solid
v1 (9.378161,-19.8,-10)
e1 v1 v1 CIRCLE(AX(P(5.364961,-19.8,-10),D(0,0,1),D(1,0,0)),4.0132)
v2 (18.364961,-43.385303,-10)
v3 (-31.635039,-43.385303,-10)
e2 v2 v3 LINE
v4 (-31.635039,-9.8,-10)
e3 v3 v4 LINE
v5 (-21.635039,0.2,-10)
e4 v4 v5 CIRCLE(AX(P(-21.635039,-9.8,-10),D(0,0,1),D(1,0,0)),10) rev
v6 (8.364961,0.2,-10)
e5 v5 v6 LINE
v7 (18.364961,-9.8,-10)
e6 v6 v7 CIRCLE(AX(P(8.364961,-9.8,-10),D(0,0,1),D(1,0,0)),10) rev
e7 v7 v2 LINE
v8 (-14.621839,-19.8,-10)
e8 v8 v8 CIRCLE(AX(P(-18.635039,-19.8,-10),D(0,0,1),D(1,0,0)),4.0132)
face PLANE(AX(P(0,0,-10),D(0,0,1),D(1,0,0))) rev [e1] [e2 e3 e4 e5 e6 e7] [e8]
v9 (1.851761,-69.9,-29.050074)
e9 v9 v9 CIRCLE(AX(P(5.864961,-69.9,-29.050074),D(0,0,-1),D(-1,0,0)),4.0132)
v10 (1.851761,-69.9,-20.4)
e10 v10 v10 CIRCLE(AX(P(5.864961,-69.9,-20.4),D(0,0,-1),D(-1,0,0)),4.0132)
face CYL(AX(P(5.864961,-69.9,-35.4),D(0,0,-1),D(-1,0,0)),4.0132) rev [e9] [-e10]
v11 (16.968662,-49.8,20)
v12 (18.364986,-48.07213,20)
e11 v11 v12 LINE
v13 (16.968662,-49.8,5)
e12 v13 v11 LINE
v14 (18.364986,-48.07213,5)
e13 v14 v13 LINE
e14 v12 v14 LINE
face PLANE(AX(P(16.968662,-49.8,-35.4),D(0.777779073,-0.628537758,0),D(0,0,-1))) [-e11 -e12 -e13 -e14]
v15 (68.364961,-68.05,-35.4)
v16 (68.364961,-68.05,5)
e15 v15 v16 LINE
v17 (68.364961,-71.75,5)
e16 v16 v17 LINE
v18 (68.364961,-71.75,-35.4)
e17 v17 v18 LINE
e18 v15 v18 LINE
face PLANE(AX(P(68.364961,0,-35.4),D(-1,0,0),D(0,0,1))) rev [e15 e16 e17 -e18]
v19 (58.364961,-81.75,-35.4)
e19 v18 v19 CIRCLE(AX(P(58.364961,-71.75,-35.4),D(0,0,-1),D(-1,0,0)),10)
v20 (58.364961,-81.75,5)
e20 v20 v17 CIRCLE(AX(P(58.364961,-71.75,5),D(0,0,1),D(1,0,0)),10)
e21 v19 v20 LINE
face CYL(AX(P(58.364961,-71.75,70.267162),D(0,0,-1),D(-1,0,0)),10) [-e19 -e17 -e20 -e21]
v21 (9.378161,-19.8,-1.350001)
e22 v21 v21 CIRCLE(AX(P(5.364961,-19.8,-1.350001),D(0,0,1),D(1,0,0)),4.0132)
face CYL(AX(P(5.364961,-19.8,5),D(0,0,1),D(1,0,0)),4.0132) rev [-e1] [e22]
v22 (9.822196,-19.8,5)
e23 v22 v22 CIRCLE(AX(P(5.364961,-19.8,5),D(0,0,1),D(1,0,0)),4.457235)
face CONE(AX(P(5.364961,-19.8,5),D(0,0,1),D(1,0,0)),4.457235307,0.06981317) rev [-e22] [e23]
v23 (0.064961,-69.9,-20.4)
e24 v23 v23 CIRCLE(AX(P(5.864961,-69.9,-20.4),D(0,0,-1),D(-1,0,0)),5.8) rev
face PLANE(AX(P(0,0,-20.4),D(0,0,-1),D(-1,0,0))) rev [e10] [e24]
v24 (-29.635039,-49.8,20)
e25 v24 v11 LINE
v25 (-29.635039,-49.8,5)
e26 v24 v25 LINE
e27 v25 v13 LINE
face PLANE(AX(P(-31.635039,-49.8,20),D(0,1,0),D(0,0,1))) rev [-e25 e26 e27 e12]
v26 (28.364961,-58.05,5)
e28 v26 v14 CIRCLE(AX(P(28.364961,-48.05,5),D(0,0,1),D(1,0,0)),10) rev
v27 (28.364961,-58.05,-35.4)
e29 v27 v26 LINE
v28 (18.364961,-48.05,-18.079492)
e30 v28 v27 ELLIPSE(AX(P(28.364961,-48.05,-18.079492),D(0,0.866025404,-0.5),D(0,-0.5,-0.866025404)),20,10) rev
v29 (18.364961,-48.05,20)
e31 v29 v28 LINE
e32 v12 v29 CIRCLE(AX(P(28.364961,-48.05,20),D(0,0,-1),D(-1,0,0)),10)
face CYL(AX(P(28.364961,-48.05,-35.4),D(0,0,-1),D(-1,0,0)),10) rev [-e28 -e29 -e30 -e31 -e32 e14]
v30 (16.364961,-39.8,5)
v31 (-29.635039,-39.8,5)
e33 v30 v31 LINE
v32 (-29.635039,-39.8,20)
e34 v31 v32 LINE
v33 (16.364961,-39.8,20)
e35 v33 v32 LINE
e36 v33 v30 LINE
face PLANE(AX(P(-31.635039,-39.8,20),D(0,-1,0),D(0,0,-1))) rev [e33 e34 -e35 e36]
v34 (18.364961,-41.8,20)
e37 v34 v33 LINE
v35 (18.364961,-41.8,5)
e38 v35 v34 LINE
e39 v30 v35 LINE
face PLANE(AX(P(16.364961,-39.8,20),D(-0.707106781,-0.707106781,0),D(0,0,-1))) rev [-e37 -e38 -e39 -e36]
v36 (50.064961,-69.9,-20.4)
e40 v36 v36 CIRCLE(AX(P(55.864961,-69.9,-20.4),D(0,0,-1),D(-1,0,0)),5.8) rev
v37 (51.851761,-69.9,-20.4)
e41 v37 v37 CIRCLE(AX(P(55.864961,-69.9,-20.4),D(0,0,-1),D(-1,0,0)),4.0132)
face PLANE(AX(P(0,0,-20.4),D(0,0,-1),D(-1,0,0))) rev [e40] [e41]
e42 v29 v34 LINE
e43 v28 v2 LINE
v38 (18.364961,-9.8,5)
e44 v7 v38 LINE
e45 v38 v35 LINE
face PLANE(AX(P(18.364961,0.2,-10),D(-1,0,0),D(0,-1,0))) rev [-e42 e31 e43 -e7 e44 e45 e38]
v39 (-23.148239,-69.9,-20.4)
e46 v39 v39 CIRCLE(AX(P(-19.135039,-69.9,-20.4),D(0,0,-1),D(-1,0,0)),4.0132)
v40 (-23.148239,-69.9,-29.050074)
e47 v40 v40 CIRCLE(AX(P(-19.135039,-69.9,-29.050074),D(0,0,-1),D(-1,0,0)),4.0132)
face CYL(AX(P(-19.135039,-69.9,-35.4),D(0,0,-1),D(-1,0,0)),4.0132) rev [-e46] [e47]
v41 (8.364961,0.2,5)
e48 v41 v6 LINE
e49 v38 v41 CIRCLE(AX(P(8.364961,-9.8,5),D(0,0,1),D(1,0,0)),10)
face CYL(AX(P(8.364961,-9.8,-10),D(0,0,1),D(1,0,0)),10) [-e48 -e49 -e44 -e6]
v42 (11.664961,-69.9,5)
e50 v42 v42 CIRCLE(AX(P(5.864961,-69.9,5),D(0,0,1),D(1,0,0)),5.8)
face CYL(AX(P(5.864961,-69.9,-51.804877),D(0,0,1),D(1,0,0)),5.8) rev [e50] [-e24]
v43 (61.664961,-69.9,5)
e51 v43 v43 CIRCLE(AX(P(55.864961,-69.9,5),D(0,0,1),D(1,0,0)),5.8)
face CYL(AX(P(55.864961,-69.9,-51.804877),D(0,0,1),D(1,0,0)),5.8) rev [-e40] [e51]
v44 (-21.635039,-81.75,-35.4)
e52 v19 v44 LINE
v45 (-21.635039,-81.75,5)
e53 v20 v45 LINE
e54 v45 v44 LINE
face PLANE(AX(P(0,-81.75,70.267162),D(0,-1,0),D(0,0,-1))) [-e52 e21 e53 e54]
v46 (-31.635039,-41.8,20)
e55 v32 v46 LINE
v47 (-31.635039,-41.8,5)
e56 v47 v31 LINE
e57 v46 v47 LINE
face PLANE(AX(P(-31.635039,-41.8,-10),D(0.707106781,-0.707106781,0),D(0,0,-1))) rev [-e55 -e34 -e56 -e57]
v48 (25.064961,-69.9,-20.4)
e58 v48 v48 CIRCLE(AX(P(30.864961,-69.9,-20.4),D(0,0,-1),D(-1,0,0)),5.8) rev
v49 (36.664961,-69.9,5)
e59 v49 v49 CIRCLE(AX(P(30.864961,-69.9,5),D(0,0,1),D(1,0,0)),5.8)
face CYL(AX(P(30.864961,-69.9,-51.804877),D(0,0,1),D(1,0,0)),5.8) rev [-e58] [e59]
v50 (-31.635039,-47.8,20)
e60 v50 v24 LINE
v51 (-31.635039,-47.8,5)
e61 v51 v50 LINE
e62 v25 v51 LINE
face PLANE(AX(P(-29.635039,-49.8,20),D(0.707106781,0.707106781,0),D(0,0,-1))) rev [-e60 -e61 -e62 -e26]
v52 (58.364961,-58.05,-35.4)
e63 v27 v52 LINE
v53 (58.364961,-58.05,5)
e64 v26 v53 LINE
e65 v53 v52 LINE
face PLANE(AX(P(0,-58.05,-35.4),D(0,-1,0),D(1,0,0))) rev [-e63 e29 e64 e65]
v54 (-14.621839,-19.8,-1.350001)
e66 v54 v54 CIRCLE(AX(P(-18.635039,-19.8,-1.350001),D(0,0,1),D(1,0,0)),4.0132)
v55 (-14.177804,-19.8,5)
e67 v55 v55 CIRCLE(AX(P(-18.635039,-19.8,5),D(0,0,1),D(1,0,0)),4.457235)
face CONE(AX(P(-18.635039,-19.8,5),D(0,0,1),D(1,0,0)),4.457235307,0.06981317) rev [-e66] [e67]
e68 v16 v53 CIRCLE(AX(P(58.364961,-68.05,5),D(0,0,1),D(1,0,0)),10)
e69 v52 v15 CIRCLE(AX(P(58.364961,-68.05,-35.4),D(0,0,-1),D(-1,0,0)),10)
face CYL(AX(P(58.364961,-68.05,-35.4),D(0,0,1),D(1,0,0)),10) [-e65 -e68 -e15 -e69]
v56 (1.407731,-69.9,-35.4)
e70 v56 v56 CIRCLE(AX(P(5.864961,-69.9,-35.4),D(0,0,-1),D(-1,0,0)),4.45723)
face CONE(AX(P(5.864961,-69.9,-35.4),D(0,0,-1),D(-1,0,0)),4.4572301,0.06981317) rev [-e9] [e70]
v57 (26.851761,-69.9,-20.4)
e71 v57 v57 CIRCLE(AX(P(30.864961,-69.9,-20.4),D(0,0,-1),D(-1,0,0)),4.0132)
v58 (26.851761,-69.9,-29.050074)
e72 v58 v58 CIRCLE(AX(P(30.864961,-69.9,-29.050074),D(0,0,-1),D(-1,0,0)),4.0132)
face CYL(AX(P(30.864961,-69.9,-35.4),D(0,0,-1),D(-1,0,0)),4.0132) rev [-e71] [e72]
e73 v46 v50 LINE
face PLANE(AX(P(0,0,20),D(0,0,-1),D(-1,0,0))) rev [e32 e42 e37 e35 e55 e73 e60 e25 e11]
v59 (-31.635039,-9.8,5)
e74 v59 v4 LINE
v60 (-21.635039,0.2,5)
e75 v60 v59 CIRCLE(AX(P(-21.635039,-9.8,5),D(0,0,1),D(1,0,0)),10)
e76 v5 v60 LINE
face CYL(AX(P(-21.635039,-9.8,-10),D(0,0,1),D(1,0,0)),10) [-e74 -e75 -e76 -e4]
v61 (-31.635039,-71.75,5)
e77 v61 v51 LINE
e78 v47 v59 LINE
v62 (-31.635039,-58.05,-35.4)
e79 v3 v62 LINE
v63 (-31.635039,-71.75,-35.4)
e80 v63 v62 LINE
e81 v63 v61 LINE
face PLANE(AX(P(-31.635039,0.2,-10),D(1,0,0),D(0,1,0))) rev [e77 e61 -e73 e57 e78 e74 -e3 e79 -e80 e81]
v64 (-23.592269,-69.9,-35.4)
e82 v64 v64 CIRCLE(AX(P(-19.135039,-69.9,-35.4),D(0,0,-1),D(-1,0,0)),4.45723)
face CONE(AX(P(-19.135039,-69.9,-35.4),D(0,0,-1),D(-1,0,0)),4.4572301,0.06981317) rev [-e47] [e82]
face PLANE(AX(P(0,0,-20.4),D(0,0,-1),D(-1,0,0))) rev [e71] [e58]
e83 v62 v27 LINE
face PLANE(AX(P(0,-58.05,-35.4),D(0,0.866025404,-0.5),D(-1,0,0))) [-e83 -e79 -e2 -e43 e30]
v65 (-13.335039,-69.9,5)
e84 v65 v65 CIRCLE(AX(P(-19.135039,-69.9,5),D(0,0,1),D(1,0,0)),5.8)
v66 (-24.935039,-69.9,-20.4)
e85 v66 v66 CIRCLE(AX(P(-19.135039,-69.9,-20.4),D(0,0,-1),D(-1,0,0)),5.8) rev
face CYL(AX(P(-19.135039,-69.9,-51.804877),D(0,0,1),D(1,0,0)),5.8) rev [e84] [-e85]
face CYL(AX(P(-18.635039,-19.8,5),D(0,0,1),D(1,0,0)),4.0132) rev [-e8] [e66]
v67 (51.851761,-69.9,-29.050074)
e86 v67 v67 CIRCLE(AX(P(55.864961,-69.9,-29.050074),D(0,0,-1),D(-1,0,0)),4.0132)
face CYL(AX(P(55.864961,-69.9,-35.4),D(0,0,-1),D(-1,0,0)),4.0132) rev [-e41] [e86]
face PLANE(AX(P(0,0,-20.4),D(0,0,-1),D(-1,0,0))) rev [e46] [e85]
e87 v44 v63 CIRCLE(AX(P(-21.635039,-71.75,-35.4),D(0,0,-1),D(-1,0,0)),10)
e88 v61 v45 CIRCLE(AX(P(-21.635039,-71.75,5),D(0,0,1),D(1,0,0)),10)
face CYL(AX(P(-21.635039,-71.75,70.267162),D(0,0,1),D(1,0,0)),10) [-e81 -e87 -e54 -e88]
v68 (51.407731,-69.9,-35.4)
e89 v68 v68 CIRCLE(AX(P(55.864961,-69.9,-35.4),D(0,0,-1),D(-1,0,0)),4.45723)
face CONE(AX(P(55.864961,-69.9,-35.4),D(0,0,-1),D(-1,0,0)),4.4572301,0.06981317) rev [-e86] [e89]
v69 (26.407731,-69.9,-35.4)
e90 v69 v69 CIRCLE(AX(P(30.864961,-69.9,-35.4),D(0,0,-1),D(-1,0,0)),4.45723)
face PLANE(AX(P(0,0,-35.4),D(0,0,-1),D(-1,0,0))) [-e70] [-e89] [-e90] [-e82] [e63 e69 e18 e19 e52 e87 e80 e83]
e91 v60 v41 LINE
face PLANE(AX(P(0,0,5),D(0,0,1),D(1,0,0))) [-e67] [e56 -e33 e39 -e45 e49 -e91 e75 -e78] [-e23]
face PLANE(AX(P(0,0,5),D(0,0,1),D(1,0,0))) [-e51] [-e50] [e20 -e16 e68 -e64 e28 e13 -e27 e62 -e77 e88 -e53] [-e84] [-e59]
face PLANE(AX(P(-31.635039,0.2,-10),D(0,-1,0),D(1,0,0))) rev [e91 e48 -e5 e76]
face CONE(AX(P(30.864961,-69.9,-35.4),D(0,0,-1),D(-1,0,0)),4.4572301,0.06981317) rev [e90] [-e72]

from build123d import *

# Parameters (mm, degrees)
SKETCH4_W                         = 50
SKETCH4_H                         = 40
BOSS_EXTRUDE2_DEPTH               = 15
O_0_316_DIAMETER_HOLE1_AT_2_COUNT = 2
O_0_316_DIAMETER_HOLE1_AT_2_PITCH = 24
SKETCH10_W                        = 50
SKETCH10_H                        = 41.95
BOSS_EXTRUDE3_DEPTH               = 15
SKETCH12_W                        = 50
SKETCH12_H                        = 10
BOSS_EXTRUDE5_DEPTH               = 15
BOSS_EXTRUDE4_REACH               = 94.649
SKETCH11_W                        = 100
SKETCH11_H                        = 23.7
BOSS_EXTRUDE4_DIRECTION_2_DEPTH   = 25.4
O_0_316_DIAMETER_HOLE2_AT_2_COUNT = 2
O_0_316_DIAMETER_HOLE2_AT_2_PITCH = 25
O_0_316_DIAMETER_HOLE2_AT_3_COUNT = 2
O_0_316_DIAMETER_HOLE2_AT_3_PITCH = 50
O_0_316_DIAMETER_HOLE2_AT_4_COUNT = 2
O_0_316_DIAMETER_HOLE2_AT_4_PITCH = 75
CUT_EXTRUDE1_START                = -25.4
SKETCH13_R                        = 5.8
SKETCH13_R_2                      = 4.0132
CUT_EXTRUDE1_DEPTH                = 25.4
CHAMFER3_SIZE2                    = 25.4
CHAMFER3_SIZE                     = 14.664696837
FILLET1_R                         = 10


# Some blends are built 0.0001 mm under size
with BuildPart() as part:
    # Sketch4 → Boss-Extrude2 (new body)
    with BuildSketch(Plane(origin=(0, 0, 5), x_dir=(-1, 0, 0), z_dir=(0, 0, -1))):
        with Locations((6.635038983, -19.8)):
            Rectangle(SKETCH4_W, SKETCH4_H)
    extrude(amount=BOSS_EXTRUDE2_DEPTH)

    # Sketch9 → O (0.316) Diameter Hole1 (revolve, cut)
    with BuildSketch(Plane(origin=(-18.635038983, -19.8, 5), x_dir=(0, -1, 0), z_dir=(1, 0, 0))):
        Polygon((0, 0), (0, 15), (4.0132, 15), (4.0132, 6.350000732), (4.457235307, 0), align=None)
    o_0_316_diameter_hole1 = revolve(axis=Axis((-18.635038983, -19.8, 11.35), (0, 0, -1)), mode=Mode.SUBTRACT)

    # O (0.316) Diameter Hole1 at 2: O (0.316) Diameter Hole1 ×2
    with Locations(*[(i * O_0_316_DIAMETER_HOLE1_AT_2_PITCH, 0, 0) for i in range(1, O_0_316_DIAMETER_HOLE1_AT_2_COUNT)]):
        add(o_0_316_diameter_hole1, mode=Mode.SUBTRACT)

    # Sketch10 → Boss-Extrude3 (add)
    with BuildSketch(Plane(origin=(0, 0, -10), x_dir=(-1, 0, 0), z_dir=(0, 0, -1))):
        with Locations((6.635038983, -60.775)):
            Rectangle(SKETCH10_W, SKETCH10_H)
    extrude(amount=-BOSS_EXTRUDE3_DEPTH)

    # Sketch12 → Boss-Extrude5 (add)
    with BuildSketch(Plane.XY.offset(5)):
        with Locations((-6.635038983, -44.8)):
            Rectangle(SKETCH12_W, SKETCH12_H)
    extrude(amount=BOSS_EXTRUDE5_DEPTH)

    # Boss-Extrude4: up to this face of the body (flat: up to its plane)
    boss_extrude4_end = Plane(part.part.faces().sort_by_distance((-6.635038983, -19.8, 5))[0])
    # Sketch11 → Boss-Extrude4 (add, up to the picked face)
    with BuildSketch(Plane(origin=(0, 0, -10), x_dir=(-1, 0, 0), z_dir=(0, 0, -1)), mode=Mode.PRIVATE) as boss_extrude4_sk1:
        with Locations((-18.364961017, -69.9)):
            Rectangle(SKETCH11_W, SKETCH11_H)
    boss_extrude4_tool1 = split(extrude(boss_extrude4_sk1.sketch, amount=-BOSS_EXTRUDE4_REACH, mode=Mode.PRIVATE), bisect_by=boss_extrude4_end, keep=Keep.BOTH, mode=Mode.PRIVATE)
    add(boss_extrude4_tool1.solids().sort_by(Axis((18.364961, -69.9, -10), (0, 0, 1)))[0])

    # Sketch11 → Boss-Extrude4 direction 2 (add)
    with BuildSketch(Plane(origin=(0, 0, -10), x_dir=(-1, 0, 0), z_dir=(0, 0, -1))):
        with Locations((-18.364961017, -69.9)):
            Rectangle(SKETCH11_W, SKETCH11_H)
    extrude(amount=BOSS_EXTRUDE4_DIRECTION_2_DEPTH)

    # Sketch19 → O (0.316) Diameter Hole2 (revolve, cut)
    with BuildSketch(Plane(origin=(55.864961017, -69.9, -35.4), x_dir=(0, 1, 0), z_dir=(1, 0, 0))):
        Polygon((0, 0), (0, 55.4), (4.0132, 55.4), (4.0132, 6.349926268), (4.4572301, 0), align=None)
    o_0_316_diameter_hole2 = revolve(axis=Axis((55.864961017, -69.9, -41.75), (0, 0, 1)), mode=Mode.SUBTRACT)

    # O (0.316) Diameter Hole2 at 2: O (0.316) Diameter Hole2 ×2
    with Locations(*[(-i * O_0_316_DIAMETER_HOLE2_AT_2_PITCH, 0, 0) for i in range(1, O_0_316_DIAMETER_HOLE2_AT_2_COUNT)]):
        add(o_0_316_diameter_hole2, mode=Mode.SUBTRACT)

    # O (0.316) Diameter Hole2 at 3: O (0.316) Diameter Hole2 ×2
    with Locations(*[(-i * O_0_316_DIAMETER_HOLE2_AT_3_PITCH, 0, 0) for i in range(1, O_0_316_DIAMETER_HOLE2_AT_3_COUNT)]):
        add(o_0_316_diameter_hole2, mode=Mode.SUBTRACT)

    # O (0.316) Diameter Hole2 at 4: O (0.316) Diameter Hole2 ×2
    with Locations(*[(-i * O_0_316_DIAMETER_HOLE2_AT_4_PITCH, 0, 0) for i in range(1, O_0_316_DIAMETER_HOLE2_AT_4_COUNT)]):
        add(o_0_316_diameter_hole2, mode=Mode.SUBTRACT)

    # Sketch13 → Cut-Extrude1 (cut)
    # profile 1 of 4: a face of its own
    with BuildSketch(Plane.XY.offset(5).offset(CUT_EXTRUDE1_START)):
        with Locations((-19.135038983, -69.9)):
            Circle(SKETCH13_R)
        with Locations(Location((-19.135038983, -69.9, 0), (0, 0, 180))):
            Circle(SKETCH13_R_2, mode=Mode.SUBTRACT)
    # profile 2 of 4: a face of its own
    with BuildSketch(Plane.XY.offset(5).offset(CUT_EXTRUDE1_START)):
        with Locations((5.864961017, -69.9)):
            Circle(SKETCH13_R)
        with Locations(Location((5.864961017, -69.9, 0), (0, 0, 180))):
            Circle(SKETCH13_R_2, mode=Mode.SUBTRACT)
    # profile 3 of 4: a face of its own
    with BuildSketch(Plane.XY.offset(5).offset(CUT_EXTRUDE1_START)):
        with Locations((30.864961017, -69.9)):
            Circle(SKETCH13_R)
        with Locations(Location((30.864961017, -69.9, 0), (0, 0, 180))):
            Circle(SKETCH13_R_2, mode=Mode.SUBTRACT)
    # profile 4 of 4: a face of its own
    with BuildSketch(Plane.XY.offset(5).offset(CUT_EXTRUDE1_START)):
        with Locations((55.864961017, -69.9)):
            Circle(SKETCH13_R)
        with Locations(Location((55.864961017, -69.9, 0), (0, 0, 180))):
            Circle(SKETCH13_R_2, mode=Mode.SUBTRACT)
    extrude(amount=CUT_EXTRUDE1_DEPTH, mode=Mode.SUBTRACT)

    # Chamfer3
    chamfer3_edges = [part.edges().sort_by_distance(p)[0] for p in [
        (-6.635038983, -58.05, -10),
    ]]
    chamfer3_side = [part.faces().sort_by_distance(p)[0] for p in [
        (-6.635038983, -57.756706063, -10),
    ]]
    chamfer(chamfer3_edges, length=CHAMFER3_SIZE - 0.0001, length2=CHAMFER3_SIZE2 - 0.0001, reference=chamfer3_side[0])  # a hair under: the kernel refuses the full size

    # Fillet1
    fillet1_edges = [part.edges().sort_by_distance(p)[0] for p in [
        (-31.635038983, -81.75, -15.2),
        (68.364961017, -58.05, -15.2),
        (68.364961017, -81.75, -15.2),
        (18.364961017, 0.2, -2.5),
        (-31.635038983, 0.2, -2.5),
        (18.364961017, -58.05, -15.19995),
    ]]
    fillet(fillet1_edges, radius=FILLET1_R)

    # Chamfer2
    # the kernel refuses this chamfer: 2, 1.724779618 mm, written as the material it takes off along each edge
    with BuildSketch(Plane(origin=(18.519276683, -49.8, 5), x_dir=(-0.058004303634580846, 0.9983163330126716, 0), z_dir=(0, 0, 1))) as chamfer2_piece_1:
        with BuildLine():
            Line((1.793111056, 0), (0.030741404, 1.601811697))
            Line((0.030741404, 1.601811697), (-0.009191249, 1.60413187))
            ThreePointArc((-0.009191249, 1.60413187), (0.006496831, 0.80142144), (-0.039932653, 0.002320172))
            Line((-0.039932653, 0.002320172), (0.004703846, -0.03972246))
            ThreePointArc((0.004703846, -0.03972246), (0.895839611, 0.025445038), (1.790879262, -0.03993769))
            Line((1.790879262, -0.03993769), (1.793111056, 0))
        make_face()
    extrude(amount=19.48277764, mode=Mode.SUBTRACT)
    with BuildSketch(Plane(origin=(-31.635038983, -39.8, 5), x_dir=(0.9996219169112968, 0.0274958766105856, 0), z_dir=(0, 0, 1))) as chamfer2_piece_2:
        with BuildLine():
            Line((2.05734639, 0), (-0.11309431, -2.054235587))
            Line((-0.11309431, -2.054235587), (-0.153079186, -2.053135752))
            ThreePointArc((-0.153079186, -2.053135752), (-0.068258454, -1.026795659), (-0.039984877, 0.001099835))
            Line((-0.039984877, 0.001099835), (0.001099835, 0.039984877))
            ThreePointArc((0.001099835, 0.039984877), (1.028995329, 0.011711299), (2.058446225, 0.039984877))
            Line((2.058446225, 0.039984877), (2.05734639, 0))
        make_face()
    extrude(amount=20.143365976, mode=Mode.SUBTRACT)
    with BuildSketch(Plane(origin=(-31.635038983, -49.8, 5), x_dir=(0.9996219169112968, -0.027495876610585647, 0), z_dir=(0, 0, 1)), Plane(origin=(18.364961017, -39.8, 5), x_dir=(-0.9996219169112968, 0.027495876610585647, 0), z_dir=(0, 0, 1))) as chamfer2_piece_3:
        with BuildLine():
            Line((2.05734639, 0), (-0.11309431, 2.054235587))
            Line((-0.11309431, 2.054235587), (-0.153079186, 2.053135752))
            ThreePointArc((-0.153079186, 2.053135752), (-0.068258454, 1.026795659), (-0.039984877, -0.001099835))
            Line((-0.039984877, -0.001099835), (0.001099835, -0.039984877))
            ThreePointArc((0.001099835, -0.039984877), (1.028995329, -0.011711299), (2.058446225, -0.039984877))
            Line((2.058446225, -0.039984877), (2.05734639, 0))
        make_face()
    extrude(amount=20.143365976, mode=Mode.SUBTRACT)


solid = part.part
